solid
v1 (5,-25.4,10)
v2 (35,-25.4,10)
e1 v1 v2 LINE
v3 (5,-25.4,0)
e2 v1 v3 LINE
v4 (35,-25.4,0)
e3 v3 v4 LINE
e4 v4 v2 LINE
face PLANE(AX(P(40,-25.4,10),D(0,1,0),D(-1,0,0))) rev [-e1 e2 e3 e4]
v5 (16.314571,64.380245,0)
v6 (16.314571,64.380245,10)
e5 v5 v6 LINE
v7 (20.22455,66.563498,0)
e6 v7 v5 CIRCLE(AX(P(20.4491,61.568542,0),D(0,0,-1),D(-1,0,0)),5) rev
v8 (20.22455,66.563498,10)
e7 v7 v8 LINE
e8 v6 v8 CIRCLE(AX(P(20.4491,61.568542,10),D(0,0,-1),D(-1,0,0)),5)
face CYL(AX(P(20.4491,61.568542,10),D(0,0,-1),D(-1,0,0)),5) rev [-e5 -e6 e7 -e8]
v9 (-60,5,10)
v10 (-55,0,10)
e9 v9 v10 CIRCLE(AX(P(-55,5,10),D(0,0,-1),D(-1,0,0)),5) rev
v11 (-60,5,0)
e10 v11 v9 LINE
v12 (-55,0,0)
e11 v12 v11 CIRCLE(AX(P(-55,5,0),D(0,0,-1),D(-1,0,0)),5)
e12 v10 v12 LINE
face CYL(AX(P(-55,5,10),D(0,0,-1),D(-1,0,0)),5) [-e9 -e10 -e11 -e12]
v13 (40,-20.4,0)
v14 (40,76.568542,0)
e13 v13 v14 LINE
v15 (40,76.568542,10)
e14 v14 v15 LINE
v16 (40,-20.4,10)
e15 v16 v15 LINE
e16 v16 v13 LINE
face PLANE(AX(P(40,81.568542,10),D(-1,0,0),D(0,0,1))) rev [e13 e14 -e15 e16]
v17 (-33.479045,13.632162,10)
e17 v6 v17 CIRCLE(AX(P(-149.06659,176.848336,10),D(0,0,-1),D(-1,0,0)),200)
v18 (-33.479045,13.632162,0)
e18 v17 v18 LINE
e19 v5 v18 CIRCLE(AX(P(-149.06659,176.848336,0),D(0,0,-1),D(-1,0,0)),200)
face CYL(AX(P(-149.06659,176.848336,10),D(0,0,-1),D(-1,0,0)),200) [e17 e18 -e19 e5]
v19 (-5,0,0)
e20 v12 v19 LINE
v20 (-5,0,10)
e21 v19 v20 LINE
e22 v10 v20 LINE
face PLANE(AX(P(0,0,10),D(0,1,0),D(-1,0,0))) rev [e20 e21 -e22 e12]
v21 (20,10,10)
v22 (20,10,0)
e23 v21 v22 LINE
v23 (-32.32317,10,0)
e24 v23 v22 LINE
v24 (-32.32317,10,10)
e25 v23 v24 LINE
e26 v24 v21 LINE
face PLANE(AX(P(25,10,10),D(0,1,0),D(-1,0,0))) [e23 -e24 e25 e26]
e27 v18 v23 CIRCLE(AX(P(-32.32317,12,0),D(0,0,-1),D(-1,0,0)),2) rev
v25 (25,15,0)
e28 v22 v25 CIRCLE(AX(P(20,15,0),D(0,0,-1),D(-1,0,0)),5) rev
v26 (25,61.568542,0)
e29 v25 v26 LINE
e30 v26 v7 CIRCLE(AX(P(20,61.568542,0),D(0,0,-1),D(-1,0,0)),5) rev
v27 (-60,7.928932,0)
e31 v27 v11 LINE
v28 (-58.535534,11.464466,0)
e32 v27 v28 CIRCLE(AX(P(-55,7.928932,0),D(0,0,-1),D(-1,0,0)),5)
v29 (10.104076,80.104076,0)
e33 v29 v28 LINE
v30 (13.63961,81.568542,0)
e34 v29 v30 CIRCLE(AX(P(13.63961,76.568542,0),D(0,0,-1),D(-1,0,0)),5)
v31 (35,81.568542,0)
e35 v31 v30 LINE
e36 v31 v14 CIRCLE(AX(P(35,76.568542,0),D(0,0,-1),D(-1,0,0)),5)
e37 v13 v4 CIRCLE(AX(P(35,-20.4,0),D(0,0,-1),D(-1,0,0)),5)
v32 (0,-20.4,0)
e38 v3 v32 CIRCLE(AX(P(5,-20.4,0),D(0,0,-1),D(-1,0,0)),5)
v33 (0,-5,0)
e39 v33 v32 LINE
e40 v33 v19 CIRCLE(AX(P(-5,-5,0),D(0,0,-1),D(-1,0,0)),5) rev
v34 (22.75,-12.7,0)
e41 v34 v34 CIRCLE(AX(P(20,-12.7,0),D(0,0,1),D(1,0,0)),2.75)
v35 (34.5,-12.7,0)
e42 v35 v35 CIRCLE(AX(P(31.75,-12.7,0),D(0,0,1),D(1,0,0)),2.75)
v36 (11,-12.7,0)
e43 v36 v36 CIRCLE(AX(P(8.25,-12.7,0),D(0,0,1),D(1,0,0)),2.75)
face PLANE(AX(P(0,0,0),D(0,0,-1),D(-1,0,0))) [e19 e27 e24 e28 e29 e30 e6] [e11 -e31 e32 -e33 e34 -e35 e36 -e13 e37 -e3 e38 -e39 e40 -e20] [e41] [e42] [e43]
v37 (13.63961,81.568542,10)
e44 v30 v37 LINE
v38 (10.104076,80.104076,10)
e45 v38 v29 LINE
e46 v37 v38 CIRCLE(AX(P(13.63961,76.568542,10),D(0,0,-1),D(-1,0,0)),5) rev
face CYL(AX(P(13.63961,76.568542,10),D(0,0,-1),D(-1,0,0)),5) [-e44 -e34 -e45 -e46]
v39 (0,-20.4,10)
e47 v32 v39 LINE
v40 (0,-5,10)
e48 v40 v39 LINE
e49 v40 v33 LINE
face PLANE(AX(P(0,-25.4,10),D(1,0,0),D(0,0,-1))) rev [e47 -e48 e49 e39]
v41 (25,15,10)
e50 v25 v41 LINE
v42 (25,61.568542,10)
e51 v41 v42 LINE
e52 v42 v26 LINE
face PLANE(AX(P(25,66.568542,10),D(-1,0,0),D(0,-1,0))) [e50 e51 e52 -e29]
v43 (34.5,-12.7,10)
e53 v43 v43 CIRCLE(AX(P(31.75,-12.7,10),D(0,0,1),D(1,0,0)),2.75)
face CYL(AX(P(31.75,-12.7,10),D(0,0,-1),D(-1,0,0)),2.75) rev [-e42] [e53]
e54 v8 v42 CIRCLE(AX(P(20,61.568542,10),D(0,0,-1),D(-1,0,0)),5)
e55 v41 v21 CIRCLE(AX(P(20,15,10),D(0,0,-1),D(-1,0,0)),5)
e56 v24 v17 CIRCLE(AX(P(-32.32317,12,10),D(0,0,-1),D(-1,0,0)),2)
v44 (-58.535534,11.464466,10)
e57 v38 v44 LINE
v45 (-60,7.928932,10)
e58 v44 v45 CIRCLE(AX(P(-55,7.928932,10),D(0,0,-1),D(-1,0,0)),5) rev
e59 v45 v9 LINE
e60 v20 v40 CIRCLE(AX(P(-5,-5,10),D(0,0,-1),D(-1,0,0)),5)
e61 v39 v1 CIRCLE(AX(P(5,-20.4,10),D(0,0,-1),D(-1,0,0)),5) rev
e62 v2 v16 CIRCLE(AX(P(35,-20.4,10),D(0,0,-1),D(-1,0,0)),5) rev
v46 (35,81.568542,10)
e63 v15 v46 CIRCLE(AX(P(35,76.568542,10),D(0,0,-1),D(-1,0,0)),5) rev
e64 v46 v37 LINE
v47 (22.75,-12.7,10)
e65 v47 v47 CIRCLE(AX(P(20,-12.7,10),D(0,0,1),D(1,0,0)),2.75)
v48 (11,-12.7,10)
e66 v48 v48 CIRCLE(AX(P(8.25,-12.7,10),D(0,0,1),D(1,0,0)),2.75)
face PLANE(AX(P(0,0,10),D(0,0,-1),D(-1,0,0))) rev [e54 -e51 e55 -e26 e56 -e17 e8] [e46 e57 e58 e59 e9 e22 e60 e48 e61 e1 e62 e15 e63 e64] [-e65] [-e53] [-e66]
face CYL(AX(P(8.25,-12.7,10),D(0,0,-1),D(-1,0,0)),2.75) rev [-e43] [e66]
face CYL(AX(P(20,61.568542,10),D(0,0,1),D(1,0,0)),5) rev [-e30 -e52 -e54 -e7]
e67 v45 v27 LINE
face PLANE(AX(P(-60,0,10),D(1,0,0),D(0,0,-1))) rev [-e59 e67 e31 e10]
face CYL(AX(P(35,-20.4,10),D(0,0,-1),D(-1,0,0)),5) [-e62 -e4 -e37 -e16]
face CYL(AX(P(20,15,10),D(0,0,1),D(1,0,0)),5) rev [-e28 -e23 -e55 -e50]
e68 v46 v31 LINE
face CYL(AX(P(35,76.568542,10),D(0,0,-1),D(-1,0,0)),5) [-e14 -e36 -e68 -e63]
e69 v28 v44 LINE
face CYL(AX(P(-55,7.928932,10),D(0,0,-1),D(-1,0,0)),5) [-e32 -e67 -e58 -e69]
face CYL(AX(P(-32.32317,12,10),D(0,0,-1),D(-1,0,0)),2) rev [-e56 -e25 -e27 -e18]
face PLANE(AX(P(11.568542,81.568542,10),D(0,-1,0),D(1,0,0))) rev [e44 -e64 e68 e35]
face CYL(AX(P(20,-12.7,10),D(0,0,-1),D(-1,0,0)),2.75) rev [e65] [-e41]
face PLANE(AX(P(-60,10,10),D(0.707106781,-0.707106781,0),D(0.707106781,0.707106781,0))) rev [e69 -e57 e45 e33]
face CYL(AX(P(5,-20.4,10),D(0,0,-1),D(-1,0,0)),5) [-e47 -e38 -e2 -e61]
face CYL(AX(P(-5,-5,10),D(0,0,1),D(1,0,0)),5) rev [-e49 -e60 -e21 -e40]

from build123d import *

# Parameters (mm, degrees)
SKETCH1_R           = 2.75
BOSS_EXTRUDE1_DEPTH = 10
FILLET1_R           = 5
FILLET2_R           = 2


with BuildPart() as part:
    # Sketch1 → Boss-Extrude1 (new body)
    with BuildSketch(Plane.XY):
        Polygon((-60, 10), (11.568542495, 81.568542495), (40, 81.568542495), (40, -25.4), (0, -25.4), (0, 0), (-60, 0), align=None)
        with Locations((8.25, -12.7)):
            Circle(SKETCH1_R, mode=Mode.SUBTRACT)
        with Locations((20, -12.7)):
            Circle(SKETCH1_R, mode=Mode.SUBTRACT)
        with Locations((31.75, -12.7)):
            Circle(SKETCH1_R, mode=Mode.SUBTRACT)
        with BuildLine():
            Line((17.781745931, 66.568542495), (25, 66.568542495))
            Line((25, 66.568542495), (25, 10))
            Line((25, 10), (-38.786796564, 10))
            ThreePointArc((-38.786796564, 10), (-7.645233685, 35.426979616), (17.781745931, 66.568542495))
        make_face(mode=Mode.SUBTRACT)
    extrude(amount=BOSS_EXTRUDE1_DEPTH)

    # Fillet1
    # the kernel refuses this fillet: 5 mm, written as the material it adds along each edge
    with BuildSketch(Plane(origin=(17.781745931, 66.568542495, 0), x_dir=(-0.556881790774907, -0.8305917595927212, 0), z_dir=(0, 0, 1))) as fillet1_piece_1:
        with BuildLine():
            CenterArc((2.667557701, 4.999891542), FILLET1_R, 213.840425913, 55.782189142)
            Line((-1.485401097, 2.215482588), (0, 0))
            ThreePointArc((0, 0), (1.317312445, 0.004338327), (2.63462489, 0))
        make_face()
    extrude(amount=10)
    with BuildSketch(Plane(origin=(25, 66.568542495, 0), x_dir=(0, -1, 0), z_dir=(0, 0, 1)), Plane(origin=(25, 10, 0), x_dir=(-1, 0, 0), z_dir=(0, 0, 1)), Plane(origin=(0, 0, 0), x_dir=(0, -1, 0), z_dir=(0, 0, 1))) as fillet1_piece_2:
        with BuildLine():
            CenterArc((FILLET1_R, -FILLET1_R), FILLET1_R, 90, 90)
            Line((0, -FILLET1_R), (0, 0))
            Line((0, 0), (FILLET1_R, 0))
        make_face()
    extrude(amount=10)
    # the kernel refuses this fillet: 5 mm, written as the material it takes off along each edge
    with BuildSketch(Plane(origin=(-60, 0, -12.5), x_dir=(0, 1, 0), z_dir=(0, 0, 1))) as fillet1_2_piece_1:
        with BuildLine():
            CenterArc((FILLET1_R, -FILLET1_R), FILLET1_R, 90, 90)
            Line((0, -FILLET1_R), (0, 0))
            Line((0, 0), (FILLET1_R, 0))
        make_face()
    extrude(amount=35, mode=Mode.SUBTRACT)
    with BuildSketch(Plane(origin=(-60, 10, -5.17766953), x_dir=(0.7071067811865476, 0.7071067811865476, 0), z_dir=(0, 0, 1))) as fillet1_2_piece_2:
        with BuildLine():
            CenterArc((FILLET1_R * 0.414213562373, -FILLET1_R), FILLET1_R, 90, 45)
            Line((-FILLET1_R * 0.292893218813, -FILLET1_R * 0.292893218813), (0, 0))
            Line((0, 0), (FILLET1_R * 0.414213562373, 0))
        make_face()
    extrude(amount=20.355339059, mode=Mode.SUBTRACT)
    with BuildSketch(Plane(origin=(0, -25.4, -12.5), x_dir=(1, 0, 0), z_dir=(0, 0, 1)), Plane(origin=(40, -25.4, -12.5), x_dir=(0, 1, 0), z_dir=(0, 0, 1)), Plane(origin=(40, 81.568542495, -12.5), x_dir=(-1, 0, 0), z_dir=(0, 0, 1))) as fillet1_2_piece_3:
        with BuildLine():
            CenterArc((FILLET1_R, FILLET1_R), FILLET1_R, 180, 90)
            Line((0, FILLET1_R), (0, 0))
            Line((0, 0), (FILLET1_R, 0))
        make_face()
    extrude(amount=35, mode=Mode.SUBTRACT)
    with BuildSketch(Plane(origin=(11.568542495, 81.568542495, -5.17766953), x_dir=(-0.7071067811865509, -0.707106781186544, 0), z_dir=(0, 0, 1))) as fillet1_2_piece_4:
        with BuildLine():
            CenterArc((FILLET1_R * 0.414213562373, FILLET1_R), FILLET1_R, 225, 45)
            Line((-FILLET1_R * 0.292893218813, FILLET1_R * 0.292893218813), (0, 0))
            Line((0, 0), (FILLET1_R * 0.414213562373, 0))
        make_face()
    extrude(amount=20.355339059, mode=Mode.SUBTRACT)

    # Fillet2
    fillet2_edges = [part.edges().sort_by_distance(p)[0] for p in [
        (-38.786796564, 10, 5),
    ]]
    fillet(fillet2_edges, radius=FILLET2_R)


solid = part.part
